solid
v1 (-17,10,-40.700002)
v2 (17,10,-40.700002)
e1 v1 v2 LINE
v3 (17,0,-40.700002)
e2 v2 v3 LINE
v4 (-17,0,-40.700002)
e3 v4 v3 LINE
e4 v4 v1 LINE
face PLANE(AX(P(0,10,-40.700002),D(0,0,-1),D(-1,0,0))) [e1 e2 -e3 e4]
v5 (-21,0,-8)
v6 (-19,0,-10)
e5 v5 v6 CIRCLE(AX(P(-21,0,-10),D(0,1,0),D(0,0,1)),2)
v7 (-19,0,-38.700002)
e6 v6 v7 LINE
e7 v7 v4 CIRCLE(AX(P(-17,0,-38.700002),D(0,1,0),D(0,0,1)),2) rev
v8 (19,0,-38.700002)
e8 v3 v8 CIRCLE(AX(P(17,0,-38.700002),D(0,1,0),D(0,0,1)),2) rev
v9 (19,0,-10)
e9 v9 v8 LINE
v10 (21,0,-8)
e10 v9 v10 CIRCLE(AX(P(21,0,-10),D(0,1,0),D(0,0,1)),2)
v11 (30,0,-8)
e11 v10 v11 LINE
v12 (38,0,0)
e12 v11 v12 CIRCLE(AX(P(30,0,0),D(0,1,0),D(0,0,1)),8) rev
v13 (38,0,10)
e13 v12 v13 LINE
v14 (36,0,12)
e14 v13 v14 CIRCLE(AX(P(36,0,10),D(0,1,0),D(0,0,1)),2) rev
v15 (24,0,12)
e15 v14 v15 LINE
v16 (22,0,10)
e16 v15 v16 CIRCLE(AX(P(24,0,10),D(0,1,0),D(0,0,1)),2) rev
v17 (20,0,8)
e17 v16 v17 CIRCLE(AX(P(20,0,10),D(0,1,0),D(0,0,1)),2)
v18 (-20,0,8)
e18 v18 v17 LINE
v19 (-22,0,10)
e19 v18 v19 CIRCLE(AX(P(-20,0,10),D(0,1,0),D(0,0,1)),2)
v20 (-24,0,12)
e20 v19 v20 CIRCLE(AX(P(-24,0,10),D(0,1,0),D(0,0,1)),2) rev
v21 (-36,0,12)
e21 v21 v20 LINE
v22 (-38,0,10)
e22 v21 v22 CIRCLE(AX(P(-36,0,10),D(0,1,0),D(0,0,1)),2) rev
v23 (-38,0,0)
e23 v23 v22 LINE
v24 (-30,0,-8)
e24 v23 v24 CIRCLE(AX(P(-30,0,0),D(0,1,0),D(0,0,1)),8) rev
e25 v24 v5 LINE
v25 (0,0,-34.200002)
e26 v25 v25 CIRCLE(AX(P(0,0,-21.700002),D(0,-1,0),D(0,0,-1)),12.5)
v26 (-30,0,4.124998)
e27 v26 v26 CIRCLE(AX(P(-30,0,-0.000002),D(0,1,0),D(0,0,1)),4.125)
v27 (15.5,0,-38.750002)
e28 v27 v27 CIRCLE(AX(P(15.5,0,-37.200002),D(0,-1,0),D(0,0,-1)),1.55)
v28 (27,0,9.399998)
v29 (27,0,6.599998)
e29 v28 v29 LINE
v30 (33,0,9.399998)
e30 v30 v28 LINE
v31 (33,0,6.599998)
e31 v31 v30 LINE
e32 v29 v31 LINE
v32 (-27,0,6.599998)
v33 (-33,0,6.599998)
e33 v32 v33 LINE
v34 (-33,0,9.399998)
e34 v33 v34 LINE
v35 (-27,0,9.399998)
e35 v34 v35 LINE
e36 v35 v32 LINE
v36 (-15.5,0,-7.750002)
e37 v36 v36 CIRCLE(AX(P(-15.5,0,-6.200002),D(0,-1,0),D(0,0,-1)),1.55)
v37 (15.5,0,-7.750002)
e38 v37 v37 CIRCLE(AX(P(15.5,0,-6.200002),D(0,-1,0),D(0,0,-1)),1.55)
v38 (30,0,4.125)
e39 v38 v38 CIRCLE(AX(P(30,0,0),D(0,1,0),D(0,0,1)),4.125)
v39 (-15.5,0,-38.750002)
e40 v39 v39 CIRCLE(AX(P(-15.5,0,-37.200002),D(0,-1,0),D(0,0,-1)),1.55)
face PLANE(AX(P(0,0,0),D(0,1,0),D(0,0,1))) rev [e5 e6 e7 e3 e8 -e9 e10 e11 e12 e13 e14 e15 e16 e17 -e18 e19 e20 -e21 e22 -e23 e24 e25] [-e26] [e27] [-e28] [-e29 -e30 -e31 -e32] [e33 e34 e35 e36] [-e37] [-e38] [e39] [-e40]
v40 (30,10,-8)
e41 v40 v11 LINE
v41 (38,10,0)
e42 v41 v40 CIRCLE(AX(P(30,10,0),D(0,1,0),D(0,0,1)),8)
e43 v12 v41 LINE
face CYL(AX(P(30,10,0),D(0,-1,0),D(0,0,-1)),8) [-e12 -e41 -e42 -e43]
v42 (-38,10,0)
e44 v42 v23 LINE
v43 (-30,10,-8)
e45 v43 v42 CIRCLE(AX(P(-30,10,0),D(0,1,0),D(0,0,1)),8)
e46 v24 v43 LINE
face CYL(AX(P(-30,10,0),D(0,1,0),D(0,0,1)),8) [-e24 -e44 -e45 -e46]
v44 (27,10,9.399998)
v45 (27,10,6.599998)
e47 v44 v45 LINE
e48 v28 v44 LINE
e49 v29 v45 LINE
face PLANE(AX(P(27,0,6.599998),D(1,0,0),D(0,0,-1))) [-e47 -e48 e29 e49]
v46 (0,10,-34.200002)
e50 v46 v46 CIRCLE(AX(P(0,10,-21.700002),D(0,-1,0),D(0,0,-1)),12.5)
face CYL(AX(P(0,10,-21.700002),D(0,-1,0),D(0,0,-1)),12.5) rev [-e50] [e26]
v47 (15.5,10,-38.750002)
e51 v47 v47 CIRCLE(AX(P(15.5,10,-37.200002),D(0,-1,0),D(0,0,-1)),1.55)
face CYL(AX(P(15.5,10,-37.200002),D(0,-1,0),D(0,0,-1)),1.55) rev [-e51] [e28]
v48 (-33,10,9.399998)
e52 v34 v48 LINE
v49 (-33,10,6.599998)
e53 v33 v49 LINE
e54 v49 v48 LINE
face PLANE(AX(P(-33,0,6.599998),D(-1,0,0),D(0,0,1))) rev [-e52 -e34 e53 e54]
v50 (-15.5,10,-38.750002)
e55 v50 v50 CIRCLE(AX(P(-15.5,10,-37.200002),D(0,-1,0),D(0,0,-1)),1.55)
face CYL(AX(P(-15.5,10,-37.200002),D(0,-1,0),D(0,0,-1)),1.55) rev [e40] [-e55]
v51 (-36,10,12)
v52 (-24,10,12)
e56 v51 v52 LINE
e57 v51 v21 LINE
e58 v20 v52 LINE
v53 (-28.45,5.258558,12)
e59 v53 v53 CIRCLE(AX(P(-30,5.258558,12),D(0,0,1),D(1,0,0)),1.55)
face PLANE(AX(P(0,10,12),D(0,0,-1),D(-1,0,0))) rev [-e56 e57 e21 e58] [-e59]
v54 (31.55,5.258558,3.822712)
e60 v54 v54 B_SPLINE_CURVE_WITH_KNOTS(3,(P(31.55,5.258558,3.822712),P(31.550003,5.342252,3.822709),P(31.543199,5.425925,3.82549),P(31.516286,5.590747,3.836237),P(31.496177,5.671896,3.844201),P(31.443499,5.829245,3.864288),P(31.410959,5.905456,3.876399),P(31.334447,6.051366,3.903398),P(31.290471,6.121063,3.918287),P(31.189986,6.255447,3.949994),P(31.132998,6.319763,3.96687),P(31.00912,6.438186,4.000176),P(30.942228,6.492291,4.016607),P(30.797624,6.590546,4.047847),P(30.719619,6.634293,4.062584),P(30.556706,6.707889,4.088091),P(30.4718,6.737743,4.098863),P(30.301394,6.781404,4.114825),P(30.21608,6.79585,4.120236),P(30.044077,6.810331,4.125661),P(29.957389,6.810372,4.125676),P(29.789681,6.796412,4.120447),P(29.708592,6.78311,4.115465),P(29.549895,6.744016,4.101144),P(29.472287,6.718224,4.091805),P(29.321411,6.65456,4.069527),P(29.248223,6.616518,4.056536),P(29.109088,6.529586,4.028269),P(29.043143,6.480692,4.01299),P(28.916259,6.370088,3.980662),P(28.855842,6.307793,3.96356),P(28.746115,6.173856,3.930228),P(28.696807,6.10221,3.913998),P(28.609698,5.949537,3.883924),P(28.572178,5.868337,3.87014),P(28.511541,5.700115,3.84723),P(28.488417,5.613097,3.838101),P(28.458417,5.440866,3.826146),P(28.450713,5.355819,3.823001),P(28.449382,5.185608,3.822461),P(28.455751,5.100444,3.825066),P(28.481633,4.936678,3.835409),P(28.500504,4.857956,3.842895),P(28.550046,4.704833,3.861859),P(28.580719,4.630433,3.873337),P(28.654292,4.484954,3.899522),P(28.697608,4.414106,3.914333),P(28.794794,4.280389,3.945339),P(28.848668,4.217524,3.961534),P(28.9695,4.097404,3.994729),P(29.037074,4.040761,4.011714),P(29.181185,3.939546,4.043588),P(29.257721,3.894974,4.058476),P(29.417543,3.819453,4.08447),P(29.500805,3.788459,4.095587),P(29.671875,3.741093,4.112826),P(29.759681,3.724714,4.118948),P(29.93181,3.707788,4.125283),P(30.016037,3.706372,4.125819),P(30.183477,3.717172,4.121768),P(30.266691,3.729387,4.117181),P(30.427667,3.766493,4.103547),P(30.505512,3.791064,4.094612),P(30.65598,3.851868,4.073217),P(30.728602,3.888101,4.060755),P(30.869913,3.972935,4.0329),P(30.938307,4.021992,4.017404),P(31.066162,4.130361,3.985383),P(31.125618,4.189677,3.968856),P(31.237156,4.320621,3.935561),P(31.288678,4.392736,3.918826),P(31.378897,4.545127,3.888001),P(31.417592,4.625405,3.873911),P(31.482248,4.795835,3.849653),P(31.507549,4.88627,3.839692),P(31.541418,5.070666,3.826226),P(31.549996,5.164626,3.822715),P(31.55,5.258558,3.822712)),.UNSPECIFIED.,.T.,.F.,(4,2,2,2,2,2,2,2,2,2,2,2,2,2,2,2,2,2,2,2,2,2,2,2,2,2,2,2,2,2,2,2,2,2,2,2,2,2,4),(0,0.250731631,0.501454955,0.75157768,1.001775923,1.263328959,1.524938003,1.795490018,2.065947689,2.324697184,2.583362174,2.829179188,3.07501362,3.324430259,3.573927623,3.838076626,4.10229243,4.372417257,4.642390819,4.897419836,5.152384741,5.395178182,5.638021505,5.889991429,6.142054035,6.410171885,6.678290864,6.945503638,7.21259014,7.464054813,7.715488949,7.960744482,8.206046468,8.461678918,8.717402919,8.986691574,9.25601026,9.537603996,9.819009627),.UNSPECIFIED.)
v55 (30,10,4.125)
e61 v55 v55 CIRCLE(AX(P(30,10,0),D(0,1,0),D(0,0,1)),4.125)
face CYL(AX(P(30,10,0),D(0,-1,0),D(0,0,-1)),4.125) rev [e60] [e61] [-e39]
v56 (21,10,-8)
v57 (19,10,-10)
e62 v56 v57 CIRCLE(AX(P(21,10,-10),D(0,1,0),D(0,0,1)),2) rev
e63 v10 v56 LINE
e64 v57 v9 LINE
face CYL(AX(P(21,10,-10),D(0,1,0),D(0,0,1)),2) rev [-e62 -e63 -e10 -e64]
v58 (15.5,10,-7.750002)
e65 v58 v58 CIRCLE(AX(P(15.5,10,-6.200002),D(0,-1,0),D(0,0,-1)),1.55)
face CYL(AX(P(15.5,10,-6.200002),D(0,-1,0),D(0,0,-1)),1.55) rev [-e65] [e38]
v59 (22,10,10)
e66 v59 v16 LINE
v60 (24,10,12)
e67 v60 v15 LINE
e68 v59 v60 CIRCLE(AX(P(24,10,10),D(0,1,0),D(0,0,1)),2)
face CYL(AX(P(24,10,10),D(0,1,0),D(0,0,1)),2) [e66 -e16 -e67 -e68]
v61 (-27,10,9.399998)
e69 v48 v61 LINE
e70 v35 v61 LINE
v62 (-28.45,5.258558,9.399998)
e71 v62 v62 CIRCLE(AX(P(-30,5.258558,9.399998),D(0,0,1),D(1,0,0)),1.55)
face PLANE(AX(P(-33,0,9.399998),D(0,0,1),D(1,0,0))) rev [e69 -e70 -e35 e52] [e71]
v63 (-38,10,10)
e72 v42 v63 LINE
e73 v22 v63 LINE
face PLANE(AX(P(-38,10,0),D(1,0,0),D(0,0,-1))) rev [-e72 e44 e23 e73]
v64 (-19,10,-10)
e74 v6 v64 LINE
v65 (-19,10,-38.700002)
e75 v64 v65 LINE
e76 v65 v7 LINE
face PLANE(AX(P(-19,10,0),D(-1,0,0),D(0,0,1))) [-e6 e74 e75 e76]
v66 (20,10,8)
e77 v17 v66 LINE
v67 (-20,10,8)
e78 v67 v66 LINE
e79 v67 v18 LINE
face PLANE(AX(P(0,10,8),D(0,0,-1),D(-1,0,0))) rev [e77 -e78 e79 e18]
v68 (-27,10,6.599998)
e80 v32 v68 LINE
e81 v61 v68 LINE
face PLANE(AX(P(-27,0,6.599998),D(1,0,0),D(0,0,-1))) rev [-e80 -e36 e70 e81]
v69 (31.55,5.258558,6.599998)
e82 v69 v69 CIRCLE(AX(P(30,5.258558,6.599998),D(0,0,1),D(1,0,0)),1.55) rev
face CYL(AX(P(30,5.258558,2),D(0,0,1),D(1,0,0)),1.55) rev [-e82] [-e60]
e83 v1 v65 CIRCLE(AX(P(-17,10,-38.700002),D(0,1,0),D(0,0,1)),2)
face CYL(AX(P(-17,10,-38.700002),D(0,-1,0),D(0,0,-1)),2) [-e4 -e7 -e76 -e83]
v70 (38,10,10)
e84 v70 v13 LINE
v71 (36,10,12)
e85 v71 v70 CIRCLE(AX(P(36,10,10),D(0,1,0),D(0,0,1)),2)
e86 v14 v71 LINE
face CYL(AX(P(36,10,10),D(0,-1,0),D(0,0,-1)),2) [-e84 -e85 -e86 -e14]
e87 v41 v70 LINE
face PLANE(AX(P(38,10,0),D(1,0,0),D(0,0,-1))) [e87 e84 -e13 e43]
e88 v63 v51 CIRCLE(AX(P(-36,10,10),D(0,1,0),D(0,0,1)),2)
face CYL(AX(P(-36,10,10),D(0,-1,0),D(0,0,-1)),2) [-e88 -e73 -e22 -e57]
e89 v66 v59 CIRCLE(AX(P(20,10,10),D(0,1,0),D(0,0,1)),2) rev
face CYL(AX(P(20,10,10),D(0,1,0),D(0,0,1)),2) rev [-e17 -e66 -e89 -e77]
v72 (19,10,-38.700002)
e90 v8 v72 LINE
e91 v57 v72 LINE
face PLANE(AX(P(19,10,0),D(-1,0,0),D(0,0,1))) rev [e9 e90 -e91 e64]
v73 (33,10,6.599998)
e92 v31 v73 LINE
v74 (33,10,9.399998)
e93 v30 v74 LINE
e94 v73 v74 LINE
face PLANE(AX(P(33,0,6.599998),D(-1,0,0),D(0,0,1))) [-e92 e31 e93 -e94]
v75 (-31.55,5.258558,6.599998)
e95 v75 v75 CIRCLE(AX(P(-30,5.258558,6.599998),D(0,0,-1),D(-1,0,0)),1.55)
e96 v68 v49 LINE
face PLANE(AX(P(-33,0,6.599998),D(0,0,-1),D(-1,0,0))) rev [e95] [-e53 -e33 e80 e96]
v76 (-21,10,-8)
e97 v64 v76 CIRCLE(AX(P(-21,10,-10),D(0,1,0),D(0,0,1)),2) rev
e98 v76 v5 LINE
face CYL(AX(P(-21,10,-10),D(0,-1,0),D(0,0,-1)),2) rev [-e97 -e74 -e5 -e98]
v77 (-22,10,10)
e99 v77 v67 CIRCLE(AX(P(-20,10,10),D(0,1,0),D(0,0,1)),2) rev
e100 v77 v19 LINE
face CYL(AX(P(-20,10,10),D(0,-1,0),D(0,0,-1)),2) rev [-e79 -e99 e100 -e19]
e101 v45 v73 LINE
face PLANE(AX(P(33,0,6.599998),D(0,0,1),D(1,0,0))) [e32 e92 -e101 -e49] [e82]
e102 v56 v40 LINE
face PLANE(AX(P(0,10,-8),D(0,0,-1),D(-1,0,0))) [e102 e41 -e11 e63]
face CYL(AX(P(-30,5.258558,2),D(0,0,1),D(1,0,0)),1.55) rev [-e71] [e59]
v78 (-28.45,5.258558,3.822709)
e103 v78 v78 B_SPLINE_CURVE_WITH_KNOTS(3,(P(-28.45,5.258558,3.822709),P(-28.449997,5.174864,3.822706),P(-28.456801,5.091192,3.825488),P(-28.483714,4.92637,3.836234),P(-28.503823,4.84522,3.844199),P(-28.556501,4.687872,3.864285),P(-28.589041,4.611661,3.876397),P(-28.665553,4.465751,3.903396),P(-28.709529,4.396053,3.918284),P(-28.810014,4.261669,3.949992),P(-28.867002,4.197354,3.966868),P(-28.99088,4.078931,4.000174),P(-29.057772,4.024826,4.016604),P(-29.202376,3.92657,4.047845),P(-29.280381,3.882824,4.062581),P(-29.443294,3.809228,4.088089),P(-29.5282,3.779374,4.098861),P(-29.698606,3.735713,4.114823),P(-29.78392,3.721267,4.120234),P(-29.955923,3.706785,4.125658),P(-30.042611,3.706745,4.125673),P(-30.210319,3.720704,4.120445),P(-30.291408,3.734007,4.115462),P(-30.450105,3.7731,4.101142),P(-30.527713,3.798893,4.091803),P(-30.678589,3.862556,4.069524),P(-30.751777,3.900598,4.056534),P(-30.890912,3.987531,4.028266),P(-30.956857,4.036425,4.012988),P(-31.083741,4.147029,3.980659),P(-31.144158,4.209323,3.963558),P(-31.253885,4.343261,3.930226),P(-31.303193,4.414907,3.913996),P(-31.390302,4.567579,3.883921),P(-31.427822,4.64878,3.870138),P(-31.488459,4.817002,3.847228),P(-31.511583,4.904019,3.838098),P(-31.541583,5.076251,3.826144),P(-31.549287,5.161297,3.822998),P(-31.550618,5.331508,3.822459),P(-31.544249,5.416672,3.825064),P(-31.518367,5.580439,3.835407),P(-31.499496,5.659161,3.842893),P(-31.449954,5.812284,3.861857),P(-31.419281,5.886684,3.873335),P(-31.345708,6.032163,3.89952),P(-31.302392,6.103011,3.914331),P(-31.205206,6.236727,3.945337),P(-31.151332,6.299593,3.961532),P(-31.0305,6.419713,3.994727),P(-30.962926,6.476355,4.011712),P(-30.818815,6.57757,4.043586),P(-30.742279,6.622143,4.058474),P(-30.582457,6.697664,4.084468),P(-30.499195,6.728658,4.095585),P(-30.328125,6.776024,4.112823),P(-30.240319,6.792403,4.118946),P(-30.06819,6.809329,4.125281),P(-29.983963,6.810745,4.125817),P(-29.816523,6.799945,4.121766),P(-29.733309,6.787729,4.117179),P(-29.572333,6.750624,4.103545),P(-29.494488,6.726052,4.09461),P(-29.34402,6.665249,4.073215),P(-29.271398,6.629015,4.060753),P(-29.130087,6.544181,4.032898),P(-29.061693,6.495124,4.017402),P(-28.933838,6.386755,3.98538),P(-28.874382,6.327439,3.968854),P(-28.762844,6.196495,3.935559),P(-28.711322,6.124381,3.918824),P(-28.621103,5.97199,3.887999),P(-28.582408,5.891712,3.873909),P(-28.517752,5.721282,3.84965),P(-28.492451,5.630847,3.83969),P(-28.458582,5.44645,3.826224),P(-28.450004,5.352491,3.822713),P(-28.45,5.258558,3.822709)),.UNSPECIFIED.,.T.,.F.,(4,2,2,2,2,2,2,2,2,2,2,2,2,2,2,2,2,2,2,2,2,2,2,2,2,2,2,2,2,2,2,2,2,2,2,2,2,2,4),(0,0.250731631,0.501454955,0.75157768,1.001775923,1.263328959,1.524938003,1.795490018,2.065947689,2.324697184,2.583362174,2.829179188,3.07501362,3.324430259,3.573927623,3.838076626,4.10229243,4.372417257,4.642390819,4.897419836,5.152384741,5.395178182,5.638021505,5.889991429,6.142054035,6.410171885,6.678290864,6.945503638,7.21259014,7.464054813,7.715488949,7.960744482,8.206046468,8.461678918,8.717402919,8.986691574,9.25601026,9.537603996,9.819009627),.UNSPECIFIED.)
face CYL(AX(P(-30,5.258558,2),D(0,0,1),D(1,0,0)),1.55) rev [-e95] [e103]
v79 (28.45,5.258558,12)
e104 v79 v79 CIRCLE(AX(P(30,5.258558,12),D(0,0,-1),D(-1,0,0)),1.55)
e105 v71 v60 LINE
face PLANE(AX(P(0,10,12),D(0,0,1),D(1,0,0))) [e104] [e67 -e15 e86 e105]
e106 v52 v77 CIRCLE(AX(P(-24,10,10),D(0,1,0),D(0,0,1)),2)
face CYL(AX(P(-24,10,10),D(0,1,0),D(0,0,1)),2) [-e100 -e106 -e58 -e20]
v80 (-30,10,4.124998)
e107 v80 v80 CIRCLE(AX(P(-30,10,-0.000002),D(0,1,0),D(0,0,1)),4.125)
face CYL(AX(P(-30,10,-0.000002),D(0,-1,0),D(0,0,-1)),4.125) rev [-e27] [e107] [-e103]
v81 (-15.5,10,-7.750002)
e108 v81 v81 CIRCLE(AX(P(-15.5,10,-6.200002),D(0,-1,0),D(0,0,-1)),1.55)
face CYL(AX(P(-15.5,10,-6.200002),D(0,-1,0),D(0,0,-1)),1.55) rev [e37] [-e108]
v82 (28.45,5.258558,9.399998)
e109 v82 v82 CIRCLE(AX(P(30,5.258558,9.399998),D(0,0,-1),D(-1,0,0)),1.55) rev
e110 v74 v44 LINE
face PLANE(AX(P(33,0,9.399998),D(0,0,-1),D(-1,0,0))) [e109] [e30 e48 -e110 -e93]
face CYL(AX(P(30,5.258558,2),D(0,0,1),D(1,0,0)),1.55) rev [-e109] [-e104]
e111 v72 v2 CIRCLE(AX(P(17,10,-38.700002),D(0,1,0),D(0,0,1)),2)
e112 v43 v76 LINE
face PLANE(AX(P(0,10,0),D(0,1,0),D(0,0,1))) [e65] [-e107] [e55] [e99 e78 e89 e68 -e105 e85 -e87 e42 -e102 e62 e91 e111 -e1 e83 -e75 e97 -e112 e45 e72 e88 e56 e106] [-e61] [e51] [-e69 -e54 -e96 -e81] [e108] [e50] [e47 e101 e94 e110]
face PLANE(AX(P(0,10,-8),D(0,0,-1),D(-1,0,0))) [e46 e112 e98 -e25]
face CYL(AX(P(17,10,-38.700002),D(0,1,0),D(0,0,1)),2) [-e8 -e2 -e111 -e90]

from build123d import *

# Parameters (mm, degrees)
SKETCH1_W           = 16
SKETCH1_H           = 4
SKETCH1_W_2         = 76
SKETCH1_H_2         = 16
SKETCH1_R           = 4.125
BOSS_EXTRUDE1_DEPTH = 10
SKETCH2_W           = 6
SKETCH2_H           = 2.8
CUT_EXTRUDE1_DEPTH  = 10
SKETCH3_R           = 1.55
CUT_EXTRUDE2_DEPTH  = 10
FILLET1_R           = 8
FILLET2_R           = 2
SKETCH4_W           = 38
SKETCH4_H           = 32.700002283
SKETCH4_R           = 1.55
SKETCH4_R_2         = 12.5
BOSS_EXTRUDE2_DEPTH = 10
CUT_EXTRUDE3_DEPTH  = 10
FILLET4_R           = 2


with BuildPart() as part:
    # Sketch1 → Boss-Extrude1 (new body)
    # profile 1 of 3: a face of its own
    with BuildSketch(Plane(origin=(0, 0, 0), x_dir=(1, 0, 0), z_dir=(0, 1, 0))):
        with Locations((-30, -10)):
            Rectangle(SKETCH1_W, SKETCH1_H)
    # profile 2 of 3: a face of its own
    with BuildSketch(Plane(origin=(0, 0, 0), x_dir=(1, 0, 0), z_dir=(0, 1, 0))):
        Rectangle(SKETCH1_W_2, SKETCH1_H_2)
        with Locations(Location((30, 0, 0), (0, 0, 270))):
            Circle(SKETCH1_R, mode=Mode.SUBTRACT)
        with Locations(Location((-30, 2.283e-06, 0), (0, 0, 270))):
            Circle(SKETCH1_R, mode=Mode.SUBTRACT)
    # profile 3 of 3: a face of its own
    with BuildSketch(Plane(origin=(0, 0, 0), x_dir=(1, 0, 0), z_dir=(0, 1, 0))):
        with Locations((30, -10)):
            Rectangle(SKETCH1_W, SKETCH1_H)
    extrude(amount=BOSS_EXTRUDE1_DEPTH)

    # Sketch2 → Cut-Extrude1 (cut)
    with BuildSketch(Plane(origin=(0, 10, 0), x_dir=(1, 0, 0), z_dir=(0, 1, 0))):
        with Locations((-30, -7.999997717)):
            Rectangle(SKETCH2_W, SKETCH2_H)
    cut_extrude1 = extrude(amount=-CUT_EXTRUDE1_DEPTH, mode=Mode.SUBTRACT)

    # Sketch3 → Cut-Extrude2 (cut)
    with BuildSketch(Plane.XY.offset(12)):
        with Locations((-30, 5.258558289)):
            Circle(SKETCH3_R)
    cut_extrude2 = extrude(amount=-CUT_EXTRUDE2_DEPTH, mode=Mode.SUBTRACT)

    # Mirror1: Cut-Extrude1, Cut-Extrude2 across plane
    add(cut_extrude1.mirror(Plane(origin=(0, 0, 0), x_dir=(0, 0, 1), z_dir=(1, 0, 0))), mode=Mode.SUBTRACT)
    add(cut_extrude2.mirror(Plane(origin=(0, 0, 0), x_dir=(0, 0, 1), z_dir=(1, 0, 0))), mode=Mode.SUBTRACT)

    # Fillet1
    fillet1_edges = [part.edges().sort_by_distance(p)[0] for p in [
        (-38, 5, -8),
        (38, 5, -8),
    ]]
    fillet(fillet1_edges, radius=FILLET1_R)

    # Fillet2
    fillet2_edges = [part.edges().sort_by_distance(p)[0] for p in [
        (38, 5, 12),
        (22, 5, 12),
        (22, 5, 8),
        (-22, 5, 8),
        (-22, 5, 12),
        (-38, 5, 12),
    ]]
    fillet(fillet2_edges, radius=FILLET2_R - 0.0001)  # a hair under: the kernel refuses the full size

    # Sketch4 → Boss-Extrude2 (add)
    with BuildSketch(Plane.XZ):
        with Locations((0, -24.350001142)):
            Rectangle(SKETCH4_W, SKETCH4_H)
        with Locations(Location((15.5, -37.200002283, 0), (0, 0, 270))):
            Circle(SKETCH4_R, mode=Mode.SUBTRACT)
        with Locations(Location((-15.5, -37.200002283, 0), (0, 0, 270))):
            Circle(SKETCH4_R, mode=Mode.SUBTRACT)
        with Locations(Location((0, -21.700002283, 0), (0, 0, 270))):
            Circle(SKETCH4_R_2, mode=Mode.SUBTRACT)
    extrude(amount=-BOSS_EXTRUDE2_DEPTH)

    # Sketch4<3> → Cut-Extrude3 (cut)
    with BuildSketch(Plane.XZ):
        with BuildLine():
            ThreePointArc((17.05, -6.200002283), (15.5, -4.650002283), (13.95, -6.200002283))
            Line((13.95, -6.200002283), (15.5, -6.200002283))
            Line((15.5, -6.200002283), (15.5, -7.750002283))
            ThreePointArc((15.5, -7.750002283), (16.596015511, -7.296017794), (17.05, -6.200002283))
        make_face()
        with BuildLine():
            Line((15.5, -6.200002283), (13.95, -6.200002283))
            ThreePointArc((13.95, -6.200002283), (14.403984489, -7.296017794), (15.5, -7.750002283))
            Line((15.5, -7.750002283), (15.5, -6.200002283))
        make_face()
        with BuildLine():
            Line((-15.5, -7.750002283), (-15.5, -6.200002283))
            Line((-15.5, -6.200002283), (-13.95, -6.200002283))
            ThreePointArc((-13.95, -6.200002283), (-16.596015511, -5.103986772), (-15.5, -7.750002283))
        make_face()
        with BuildLine():
            Line((-13.95, -6.200002283), (-15.5, -6.200002283))
            Line((-15.5, -6.200002283), (-15.5, -7.750002283))
            ThreePointArc((-15.5, -7.750002283), (-14.403984489, -7.296017794), (-13.95, -6.200002283))
        make_face()
    extrude(amount=-CUT_EXTRUDE3_DEPTH, mode=Mode.SUBTRACT)

    # Fillet4
    fillet4_edges = [part.edges().sort_by_distance(p)[0] for p in [
        (19, 5, -8),
        (-19, 5, -8),
        (19, 5, -40.700002283),
        (-19, 5, -40.700002283),
    ]]
    fillet(fillet4_edges, radius=FILLET4_R)


solid = part.part
